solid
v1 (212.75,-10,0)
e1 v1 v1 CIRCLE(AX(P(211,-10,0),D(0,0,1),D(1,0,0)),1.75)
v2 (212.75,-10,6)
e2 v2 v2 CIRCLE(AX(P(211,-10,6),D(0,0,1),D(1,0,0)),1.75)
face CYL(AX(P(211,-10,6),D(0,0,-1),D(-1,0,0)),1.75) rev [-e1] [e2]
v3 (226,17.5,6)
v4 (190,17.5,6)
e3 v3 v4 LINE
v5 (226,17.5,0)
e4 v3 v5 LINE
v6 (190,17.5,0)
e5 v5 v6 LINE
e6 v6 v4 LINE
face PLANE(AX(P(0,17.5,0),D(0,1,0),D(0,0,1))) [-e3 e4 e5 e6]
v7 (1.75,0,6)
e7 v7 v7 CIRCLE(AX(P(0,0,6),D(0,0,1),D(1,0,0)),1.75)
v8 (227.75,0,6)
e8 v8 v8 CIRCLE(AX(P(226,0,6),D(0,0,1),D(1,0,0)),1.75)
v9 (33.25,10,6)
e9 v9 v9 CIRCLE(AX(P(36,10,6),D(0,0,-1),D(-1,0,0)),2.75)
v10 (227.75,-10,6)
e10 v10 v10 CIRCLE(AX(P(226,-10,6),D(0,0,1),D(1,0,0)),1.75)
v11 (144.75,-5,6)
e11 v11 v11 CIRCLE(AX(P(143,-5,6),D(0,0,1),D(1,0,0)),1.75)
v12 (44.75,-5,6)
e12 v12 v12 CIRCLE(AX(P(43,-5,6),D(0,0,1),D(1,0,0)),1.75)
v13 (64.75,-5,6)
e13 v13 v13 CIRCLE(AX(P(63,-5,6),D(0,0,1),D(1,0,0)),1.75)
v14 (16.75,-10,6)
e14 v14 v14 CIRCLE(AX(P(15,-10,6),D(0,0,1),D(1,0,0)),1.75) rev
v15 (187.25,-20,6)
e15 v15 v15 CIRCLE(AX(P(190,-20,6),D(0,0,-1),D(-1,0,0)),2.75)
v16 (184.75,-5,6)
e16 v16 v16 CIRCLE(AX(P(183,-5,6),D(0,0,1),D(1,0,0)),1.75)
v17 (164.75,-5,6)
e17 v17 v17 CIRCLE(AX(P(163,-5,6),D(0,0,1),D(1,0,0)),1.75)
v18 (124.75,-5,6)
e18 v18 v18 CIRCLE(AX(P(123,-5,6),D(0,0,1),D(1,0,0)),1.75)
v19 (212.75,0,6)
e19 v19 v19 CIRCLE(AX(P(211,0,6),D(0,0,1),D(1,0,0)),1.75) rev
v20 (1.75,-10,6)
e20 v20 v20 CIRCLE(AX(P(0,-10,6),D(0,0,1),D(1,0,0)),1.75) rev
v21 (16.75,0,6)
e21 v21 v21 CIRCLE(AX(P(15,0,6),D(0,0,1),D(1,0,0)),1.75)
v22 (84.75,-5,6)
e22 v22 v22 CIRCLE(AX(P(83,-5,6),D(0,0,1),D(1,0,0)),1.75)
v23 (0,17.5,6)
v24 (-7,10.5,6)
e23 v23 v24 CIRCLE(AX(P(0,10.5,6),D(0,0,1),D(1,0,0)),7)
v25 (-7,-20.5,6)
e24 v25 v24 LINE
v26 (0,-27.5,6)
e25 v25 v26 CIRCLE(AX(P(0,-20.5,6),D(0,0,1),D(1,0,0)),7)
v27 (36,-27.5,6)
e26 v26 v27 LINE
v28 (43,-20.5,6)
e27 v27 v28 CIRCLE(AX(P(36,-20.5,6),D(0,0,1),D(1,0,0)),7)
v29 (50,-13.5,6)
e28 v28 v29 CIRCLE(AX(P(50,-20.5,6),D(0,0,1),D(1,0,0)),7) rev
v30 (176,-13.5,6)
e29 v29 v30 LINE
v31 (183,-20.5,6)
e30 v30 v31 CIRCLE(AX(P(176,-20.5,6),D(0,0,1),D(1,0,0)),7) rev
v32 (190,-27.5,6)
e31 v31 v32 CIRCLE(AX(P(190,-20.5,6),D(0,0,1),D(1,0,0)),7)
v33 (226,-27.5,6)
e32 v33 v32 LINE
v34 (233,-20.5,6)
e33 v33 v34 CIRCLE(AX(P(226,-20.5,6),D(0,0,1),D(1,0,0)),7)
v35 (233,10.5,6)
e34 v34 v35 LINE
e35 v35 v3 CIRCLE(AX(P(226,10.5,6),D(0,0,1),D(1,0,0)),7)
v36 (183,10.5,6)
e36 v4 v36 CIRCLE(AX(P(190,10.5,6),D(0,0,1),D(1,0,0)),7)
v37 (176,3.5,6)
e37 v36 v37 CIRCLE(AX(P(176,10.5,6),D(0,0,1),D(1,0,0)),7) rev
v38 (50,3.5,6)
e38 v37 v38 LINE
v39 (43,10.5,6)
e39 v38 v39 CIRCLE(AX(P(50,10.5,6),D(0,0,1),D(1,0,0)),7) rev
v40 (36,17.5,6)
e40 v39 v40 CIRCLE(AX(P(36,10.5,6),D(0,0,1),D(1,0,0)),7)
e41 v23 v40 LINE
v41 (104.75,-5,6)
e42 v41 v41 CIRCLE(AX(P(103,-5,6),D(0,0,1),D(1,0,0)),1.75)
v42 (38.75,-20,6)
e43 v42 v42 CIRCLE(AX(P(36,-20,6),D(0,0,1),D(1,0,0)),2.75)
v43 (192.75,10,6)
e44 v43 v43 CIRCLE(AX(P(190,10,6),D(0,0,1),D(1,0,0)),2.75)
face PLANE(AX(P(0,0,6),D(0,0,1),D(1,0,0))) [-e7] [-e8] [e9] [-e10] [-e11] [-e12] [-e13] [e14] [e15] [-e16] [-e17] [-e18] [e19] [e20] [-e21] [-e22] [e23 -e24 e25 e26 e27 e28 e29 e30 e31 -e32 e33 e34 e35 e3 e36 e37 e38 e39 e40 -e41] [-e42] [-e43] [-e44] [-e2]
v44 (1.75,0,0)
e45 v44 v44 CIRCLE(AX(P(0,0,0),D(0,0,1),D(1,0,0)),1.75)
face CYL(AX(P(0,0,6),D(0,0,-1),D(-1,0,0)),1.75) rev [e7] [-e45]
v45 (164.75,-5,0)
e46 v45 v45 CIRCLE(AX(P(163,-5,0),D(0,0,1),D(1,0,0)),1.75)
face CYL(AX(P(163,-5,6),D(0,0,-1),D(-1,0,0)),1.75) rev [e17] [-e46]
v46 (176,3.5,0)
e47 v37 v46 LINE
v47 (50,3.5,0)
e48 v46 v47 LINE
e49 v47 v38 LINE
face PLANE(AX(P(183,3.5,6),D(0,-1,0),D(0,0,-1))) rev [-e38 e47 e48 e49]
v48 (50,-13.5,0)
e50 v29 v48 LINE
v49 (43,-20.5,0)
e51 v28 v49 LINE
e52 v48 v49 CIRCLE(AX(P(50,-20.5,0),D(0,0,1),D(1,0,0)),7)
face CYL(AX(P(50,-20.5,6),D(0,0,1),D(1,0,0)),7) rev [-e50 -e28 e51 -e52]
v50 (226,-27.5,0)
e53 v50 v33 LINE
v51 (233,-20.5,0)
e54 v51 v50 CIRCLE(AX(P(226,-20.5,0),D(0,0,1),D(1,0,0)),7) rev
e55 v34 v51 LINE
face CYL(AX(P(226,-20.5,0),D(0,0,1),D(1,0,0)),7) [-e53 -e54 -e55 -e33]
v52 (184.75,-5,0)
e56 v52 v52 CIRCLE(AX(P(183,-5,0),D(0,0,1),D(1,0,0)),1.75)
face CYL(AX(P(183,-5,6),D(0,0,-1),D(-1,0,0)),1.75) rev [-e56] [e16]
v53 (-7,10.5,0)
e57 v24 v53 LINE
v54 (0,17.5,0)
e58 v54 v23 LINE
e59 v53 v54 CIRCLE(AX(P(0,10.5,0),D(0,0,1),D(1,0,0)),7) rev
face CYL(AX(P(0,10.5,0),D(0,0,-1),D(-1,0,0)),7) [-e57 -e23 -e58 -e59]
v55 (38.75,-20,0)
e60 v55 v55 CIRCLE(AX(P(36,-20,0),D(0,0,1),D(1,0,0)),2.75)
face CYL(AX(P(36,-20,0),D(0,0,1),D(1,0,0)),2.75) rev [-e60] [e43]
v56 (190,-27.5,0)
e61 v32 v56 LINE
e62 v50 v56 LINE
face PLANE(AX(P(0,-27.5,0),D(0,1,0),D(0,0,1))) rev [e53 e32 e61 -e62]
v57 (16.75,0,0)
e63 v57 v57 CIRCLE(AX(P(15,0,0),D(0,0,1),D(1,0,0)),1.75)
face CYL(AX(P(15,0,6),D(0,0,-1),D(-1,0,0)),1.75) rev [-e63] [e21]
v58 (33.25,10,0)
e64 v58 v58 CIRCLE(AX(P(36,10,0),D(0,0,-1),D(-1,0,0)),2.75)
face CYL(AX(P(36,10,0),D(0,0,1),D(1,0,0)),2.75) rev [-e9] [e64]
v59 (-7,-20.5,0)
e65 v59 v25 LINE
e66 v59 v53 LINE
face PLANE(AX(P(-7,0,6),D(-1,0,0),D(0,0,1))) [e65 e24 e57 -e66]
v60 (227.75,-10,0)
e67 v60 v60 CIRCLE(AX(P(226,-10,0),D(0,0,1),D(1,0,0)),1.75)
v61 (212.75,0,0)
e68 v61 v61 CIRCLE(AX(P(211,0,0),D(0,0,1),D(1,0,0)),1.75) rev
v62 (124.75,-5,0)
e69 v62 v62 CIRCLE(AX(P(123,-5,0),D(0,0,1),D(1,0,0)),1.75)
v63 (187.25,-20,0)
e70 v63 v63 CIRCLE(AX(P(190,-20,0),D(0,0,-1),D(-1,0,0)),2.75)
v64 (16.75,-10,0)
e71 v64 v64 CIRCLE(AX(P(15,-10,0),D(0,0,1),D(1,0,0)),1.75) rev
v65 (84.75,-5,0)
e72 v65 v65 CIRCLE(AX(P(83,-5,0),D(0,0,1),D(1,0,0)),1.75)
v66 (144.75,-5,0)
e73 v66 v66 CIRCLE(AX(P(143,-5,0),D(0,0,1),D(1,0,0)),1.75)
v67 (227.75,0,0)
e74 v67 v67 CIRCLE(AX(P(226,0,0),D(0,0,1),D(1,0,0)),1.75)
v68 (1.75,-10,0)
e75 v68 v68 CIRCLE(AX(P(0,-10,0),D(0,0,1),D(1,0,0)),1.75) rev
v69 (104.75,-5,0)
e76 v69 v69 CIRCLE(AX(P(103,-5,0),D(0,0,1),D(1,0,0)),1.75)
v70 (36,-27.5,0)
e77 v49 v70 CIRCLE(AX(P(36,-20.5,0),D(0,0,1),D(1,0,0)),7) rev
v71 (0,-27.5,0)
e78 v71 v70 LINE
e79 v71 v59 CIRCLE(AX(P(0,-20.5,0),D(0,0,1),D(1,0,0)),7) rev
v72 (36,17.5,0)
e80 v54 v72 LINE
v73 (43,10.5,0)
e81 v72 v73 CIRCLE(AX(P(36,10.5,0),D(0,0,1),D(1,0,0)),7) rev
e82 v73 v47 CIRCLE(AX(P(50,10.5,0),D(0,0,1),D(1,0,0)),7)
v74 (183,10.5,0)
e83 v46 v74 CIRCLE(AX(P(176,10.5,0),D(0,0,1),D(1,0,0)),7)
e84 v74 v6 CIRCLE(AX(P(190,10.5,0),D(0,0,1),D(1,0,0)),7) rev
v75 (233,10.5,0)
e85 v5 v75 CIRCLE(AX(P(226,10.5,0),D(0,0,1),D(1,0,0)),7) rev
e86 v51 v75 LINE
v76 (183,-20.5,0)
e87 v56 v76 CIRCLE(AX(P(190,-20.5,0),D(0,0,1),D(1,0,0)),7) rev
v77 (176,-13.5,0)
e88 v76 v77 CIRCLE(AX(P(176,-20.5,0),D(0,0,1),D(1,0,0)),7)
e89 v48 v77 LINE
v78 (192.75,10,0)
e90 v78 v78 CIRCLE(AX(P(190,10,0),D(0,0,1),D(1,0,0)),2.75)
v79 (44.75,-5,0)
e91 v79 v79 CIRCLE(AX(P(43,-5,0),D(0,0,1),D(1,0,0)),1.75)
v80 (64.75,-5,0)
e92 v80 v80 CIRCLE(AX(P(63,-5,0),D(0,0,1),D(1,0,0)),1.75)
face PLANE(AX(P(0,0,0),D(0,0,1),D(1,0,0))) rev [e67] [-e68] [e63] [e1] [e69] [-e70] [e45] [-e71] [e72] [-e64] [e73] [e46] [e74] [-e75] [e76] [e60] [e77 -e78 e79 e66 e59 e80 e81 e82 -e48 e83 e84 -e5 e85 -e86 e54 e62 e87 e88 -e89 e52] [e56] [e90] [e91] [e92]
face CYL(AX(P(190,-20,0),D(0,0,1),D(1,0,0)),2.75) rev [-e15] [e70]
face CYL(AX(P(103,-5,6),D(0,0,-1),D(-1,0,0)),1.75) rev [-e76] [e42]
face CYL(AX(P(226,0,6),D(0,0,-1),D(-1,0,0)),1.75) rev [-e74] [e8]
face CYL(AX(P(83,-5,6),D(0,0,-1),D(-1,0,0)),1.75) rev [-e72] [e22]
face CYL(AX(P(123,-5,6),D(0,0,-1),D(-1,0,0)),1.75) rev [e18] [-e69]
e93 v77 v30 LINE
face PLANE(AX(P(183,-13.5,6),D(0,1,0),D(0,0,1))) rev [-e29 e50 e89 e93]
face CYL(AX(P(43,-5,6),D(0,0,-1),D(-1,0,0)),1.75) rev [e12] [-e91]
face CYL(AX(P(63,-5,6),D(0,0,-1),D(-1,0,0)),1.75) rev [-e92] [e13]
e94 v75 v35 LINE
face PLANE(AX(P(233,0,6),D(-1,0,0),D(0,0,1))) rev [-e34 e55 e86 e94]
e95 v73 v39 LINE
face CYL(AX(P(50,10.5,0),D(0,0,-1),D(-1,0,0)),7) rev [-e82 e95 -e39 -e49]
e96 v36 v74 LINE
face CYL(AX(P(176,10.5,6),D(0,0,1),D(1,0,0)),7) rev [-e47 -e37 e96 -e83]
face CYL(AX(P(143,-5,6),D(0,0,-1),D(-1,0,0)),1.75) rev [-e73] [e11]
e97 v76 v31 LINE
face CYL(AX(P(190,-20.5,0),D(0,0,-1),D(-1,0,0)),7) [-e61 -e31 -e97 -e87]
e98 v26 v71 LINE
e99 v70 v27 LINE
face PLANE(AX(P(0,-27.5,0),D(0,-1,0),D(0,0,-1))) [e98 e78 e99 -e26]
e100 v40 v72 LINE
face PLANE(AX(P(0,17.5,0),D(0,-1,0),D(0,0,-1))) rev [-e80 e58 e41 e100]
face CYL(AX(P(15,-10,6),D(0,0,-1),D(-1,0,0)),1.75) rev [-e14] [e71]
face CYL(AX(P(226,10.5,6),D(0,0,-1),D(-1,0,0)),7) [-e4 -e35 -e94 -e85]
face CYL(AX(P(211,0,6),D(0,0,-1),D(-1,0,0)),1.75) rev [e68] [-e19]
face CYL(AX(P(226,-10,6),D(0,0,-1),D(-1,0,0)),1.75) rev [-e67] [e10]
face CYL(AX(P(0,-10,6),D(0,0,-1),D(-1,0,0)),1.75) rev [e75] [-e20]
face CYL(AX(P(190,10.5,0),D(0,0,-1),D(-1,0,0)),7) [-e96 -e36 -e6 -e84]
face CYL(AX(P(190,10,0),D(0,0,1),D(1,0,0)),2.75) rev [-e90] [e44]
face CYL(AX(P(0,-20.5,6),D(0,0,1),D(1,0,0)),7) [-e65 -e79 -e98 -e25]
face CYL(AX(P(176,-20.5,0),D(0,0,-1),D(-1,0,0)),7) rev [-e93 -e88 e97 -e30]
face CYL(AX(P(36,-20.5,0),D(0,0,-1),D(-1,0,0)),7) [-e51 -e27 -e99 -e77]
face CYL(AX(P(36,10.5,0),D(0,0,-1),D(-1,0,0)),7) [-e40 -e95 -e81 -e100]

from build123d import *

# Parameters (mm, degrees)
SKETCH1_W           = 240
SKETCH1_H           = 25
SKETCH1_R           = 1.75
BOSS_EXTRUDE1_DEPTH = 6
SKETCH2_W           = 50
SKETCH2_H           = 10
BOSS_EXTRUDE2_DEPTH = 6
SKETCH3_W           = 140
SKETCH3_H           = 4
CUT_EXTRUDE1_DEPTH  = 235.693949645
SKETCH4_R           = 2.75
CUT_EXTRUDE2_DEPTH  = 235.693949645
FILLET1_R           = 7


with BuildPart() as part:
    # Sketch1 → Boss-Extrude1 (new body)
    with BuildSketch(Plane.XY):
        with Locations((113, -5)):
            Rectangle(SKETCH1_W, SKETCH1_H)
        Circle(SKETCH1_R, mode=Mode.SUBTRACT)
        with Locations((226, 0)):
            Circle(SKETCH1_R, mode=Mode.SUBTRACT)
        with Locations((15, 0)):
            Circle(SKETCH1_R, mode=Mode.SUBTRACT)
        with Locations((0, -10)):
            Circle(SKETCH1_R, mode=Mode.SUBTRACT)
        with Locations((15, -10)):
            Circle(SKETCH1_R, mode=Mode.SUBTRACT)
        with Locations((211, 0)):
            Circle(SKETCH1_R, mode=Mode.SUBTRACT)
        with Locations((211, -10)):
            Circle(SKETCH1_R, mode=Mode.SUBTRACT)
        with Locations((226, -10)):
            Circle(SKETCH1_R, mode=Mode.SUBTRACT)
        with Locations((183, -5)):
            Circle(SKETCH1_R, mode=Mode.SUBTRACT)
        with Locations((163, -5)):
            Circle(SKETCH1_R, mode=Mode.SUBTRACT)
        with Locations((143, -5)):
            Circle(SKETCH1_R, mode=Mode.SUBTRACT)
        with Locations((123, -5)):
            Circle(SKETCH1_R, mode=Mode.SUBTRACT)
        with Locations((103, -5)):
            Circle(SKETCH1_R, mode=Mode.SUBTRACT)
        with Locations((83, -5)):
            Circle(SKETCH1_R, mode=Mode.SUBTRACT)
        with Locations((63, -5)):
            Circle(SKETCH1_R, mode=Mode.SUBTRACT)
        with Locations((43, -5)):
            Circle(SKETCH1_R, mode=Mode.SUBTRACT)
    extrude(amount=BOSS_EXTRUDE1_DEPTH)

    # Sketch2 → Boss-Extrude2 (add)
    with BuildSketch(Plane.XY.offset(6)):
        with Locations((18, -22.5)):
            Rectangle(SKETCH2_W, SKETCH2_H)
        with Locations((18, 12.5)):
            Rectangle(SKETCH2_W, SKETCH2_H)
        with Locations((208, 12.5)):
            Rectangle(SKETCH2_W, SKETCH2_H)
        with Locations((208, -22.5)):
            Rectangle(SKETCH2_W, SKETCH2_H)
    extrude(amount=-BOSS_EXTRUDE2_DEPTH)

    # Sketch3 → Cut-Extrude1 (cut, through all)
    with BuildSketch(Plane(origin=(0, 0, 0), x_dir=(-1, 0, 0), z_dir=(0, 0, -1))):
        with Locations((-113, 5.5)):
            Rectangle(SKETCH3_W, SKETCH3_H)
        with Locations((-113, -15.5)):
            Rectangle(SKETCH3_W, SKETCH3_H)
    extrude(amount=-CUT_EXTRUDE1_DEPTH, mode=Mode.SUBTRACT)

    # Sketch4 → Cut-Extrude2 (cut, through all)
    with BuildSketch(Plane.XY.offset(6)):
        with Locations((36, -20)):
            Circle(SKETCH4_R)
        with Locations(Location((36, 10, 0), (0, 0, 180))):
            Circle(SKETCH4_R)
        with Locations((190, 10)):
            Circle(SKETCH4_R)
        with Locations(Location((190, -20, 0), (0, 0, 180))):
            Circle(SKETCH4_R)
    extrude(amount=-CUT_EXTRUDE2_DEPTH, mode=Mode.SUBTRACT)

    # Fillet1
    fillet1_edges = [part.edges().sort_by_distance(p)[0] for p in [
        (183, 3.5, 3),
        (183, 17.5, 3),
        (233, 17.5, 3),
        (233, -27.5, 3),
        (183, -13.5, 3),
        (183, -27.5, 3),
        (43, -13.5, 3),
        (43, 3.5, 3),
        (43, 17.5, 3),
        (-7, 17.5, 3),
        (43, -27.5, 3),
        (-7, -27.5, 3),
    ]]
    fillet(fillet1_edges, radius=FILLET1_R - 0.0001)  # a hair under: the kernel refuses the full size


solid = part.part
